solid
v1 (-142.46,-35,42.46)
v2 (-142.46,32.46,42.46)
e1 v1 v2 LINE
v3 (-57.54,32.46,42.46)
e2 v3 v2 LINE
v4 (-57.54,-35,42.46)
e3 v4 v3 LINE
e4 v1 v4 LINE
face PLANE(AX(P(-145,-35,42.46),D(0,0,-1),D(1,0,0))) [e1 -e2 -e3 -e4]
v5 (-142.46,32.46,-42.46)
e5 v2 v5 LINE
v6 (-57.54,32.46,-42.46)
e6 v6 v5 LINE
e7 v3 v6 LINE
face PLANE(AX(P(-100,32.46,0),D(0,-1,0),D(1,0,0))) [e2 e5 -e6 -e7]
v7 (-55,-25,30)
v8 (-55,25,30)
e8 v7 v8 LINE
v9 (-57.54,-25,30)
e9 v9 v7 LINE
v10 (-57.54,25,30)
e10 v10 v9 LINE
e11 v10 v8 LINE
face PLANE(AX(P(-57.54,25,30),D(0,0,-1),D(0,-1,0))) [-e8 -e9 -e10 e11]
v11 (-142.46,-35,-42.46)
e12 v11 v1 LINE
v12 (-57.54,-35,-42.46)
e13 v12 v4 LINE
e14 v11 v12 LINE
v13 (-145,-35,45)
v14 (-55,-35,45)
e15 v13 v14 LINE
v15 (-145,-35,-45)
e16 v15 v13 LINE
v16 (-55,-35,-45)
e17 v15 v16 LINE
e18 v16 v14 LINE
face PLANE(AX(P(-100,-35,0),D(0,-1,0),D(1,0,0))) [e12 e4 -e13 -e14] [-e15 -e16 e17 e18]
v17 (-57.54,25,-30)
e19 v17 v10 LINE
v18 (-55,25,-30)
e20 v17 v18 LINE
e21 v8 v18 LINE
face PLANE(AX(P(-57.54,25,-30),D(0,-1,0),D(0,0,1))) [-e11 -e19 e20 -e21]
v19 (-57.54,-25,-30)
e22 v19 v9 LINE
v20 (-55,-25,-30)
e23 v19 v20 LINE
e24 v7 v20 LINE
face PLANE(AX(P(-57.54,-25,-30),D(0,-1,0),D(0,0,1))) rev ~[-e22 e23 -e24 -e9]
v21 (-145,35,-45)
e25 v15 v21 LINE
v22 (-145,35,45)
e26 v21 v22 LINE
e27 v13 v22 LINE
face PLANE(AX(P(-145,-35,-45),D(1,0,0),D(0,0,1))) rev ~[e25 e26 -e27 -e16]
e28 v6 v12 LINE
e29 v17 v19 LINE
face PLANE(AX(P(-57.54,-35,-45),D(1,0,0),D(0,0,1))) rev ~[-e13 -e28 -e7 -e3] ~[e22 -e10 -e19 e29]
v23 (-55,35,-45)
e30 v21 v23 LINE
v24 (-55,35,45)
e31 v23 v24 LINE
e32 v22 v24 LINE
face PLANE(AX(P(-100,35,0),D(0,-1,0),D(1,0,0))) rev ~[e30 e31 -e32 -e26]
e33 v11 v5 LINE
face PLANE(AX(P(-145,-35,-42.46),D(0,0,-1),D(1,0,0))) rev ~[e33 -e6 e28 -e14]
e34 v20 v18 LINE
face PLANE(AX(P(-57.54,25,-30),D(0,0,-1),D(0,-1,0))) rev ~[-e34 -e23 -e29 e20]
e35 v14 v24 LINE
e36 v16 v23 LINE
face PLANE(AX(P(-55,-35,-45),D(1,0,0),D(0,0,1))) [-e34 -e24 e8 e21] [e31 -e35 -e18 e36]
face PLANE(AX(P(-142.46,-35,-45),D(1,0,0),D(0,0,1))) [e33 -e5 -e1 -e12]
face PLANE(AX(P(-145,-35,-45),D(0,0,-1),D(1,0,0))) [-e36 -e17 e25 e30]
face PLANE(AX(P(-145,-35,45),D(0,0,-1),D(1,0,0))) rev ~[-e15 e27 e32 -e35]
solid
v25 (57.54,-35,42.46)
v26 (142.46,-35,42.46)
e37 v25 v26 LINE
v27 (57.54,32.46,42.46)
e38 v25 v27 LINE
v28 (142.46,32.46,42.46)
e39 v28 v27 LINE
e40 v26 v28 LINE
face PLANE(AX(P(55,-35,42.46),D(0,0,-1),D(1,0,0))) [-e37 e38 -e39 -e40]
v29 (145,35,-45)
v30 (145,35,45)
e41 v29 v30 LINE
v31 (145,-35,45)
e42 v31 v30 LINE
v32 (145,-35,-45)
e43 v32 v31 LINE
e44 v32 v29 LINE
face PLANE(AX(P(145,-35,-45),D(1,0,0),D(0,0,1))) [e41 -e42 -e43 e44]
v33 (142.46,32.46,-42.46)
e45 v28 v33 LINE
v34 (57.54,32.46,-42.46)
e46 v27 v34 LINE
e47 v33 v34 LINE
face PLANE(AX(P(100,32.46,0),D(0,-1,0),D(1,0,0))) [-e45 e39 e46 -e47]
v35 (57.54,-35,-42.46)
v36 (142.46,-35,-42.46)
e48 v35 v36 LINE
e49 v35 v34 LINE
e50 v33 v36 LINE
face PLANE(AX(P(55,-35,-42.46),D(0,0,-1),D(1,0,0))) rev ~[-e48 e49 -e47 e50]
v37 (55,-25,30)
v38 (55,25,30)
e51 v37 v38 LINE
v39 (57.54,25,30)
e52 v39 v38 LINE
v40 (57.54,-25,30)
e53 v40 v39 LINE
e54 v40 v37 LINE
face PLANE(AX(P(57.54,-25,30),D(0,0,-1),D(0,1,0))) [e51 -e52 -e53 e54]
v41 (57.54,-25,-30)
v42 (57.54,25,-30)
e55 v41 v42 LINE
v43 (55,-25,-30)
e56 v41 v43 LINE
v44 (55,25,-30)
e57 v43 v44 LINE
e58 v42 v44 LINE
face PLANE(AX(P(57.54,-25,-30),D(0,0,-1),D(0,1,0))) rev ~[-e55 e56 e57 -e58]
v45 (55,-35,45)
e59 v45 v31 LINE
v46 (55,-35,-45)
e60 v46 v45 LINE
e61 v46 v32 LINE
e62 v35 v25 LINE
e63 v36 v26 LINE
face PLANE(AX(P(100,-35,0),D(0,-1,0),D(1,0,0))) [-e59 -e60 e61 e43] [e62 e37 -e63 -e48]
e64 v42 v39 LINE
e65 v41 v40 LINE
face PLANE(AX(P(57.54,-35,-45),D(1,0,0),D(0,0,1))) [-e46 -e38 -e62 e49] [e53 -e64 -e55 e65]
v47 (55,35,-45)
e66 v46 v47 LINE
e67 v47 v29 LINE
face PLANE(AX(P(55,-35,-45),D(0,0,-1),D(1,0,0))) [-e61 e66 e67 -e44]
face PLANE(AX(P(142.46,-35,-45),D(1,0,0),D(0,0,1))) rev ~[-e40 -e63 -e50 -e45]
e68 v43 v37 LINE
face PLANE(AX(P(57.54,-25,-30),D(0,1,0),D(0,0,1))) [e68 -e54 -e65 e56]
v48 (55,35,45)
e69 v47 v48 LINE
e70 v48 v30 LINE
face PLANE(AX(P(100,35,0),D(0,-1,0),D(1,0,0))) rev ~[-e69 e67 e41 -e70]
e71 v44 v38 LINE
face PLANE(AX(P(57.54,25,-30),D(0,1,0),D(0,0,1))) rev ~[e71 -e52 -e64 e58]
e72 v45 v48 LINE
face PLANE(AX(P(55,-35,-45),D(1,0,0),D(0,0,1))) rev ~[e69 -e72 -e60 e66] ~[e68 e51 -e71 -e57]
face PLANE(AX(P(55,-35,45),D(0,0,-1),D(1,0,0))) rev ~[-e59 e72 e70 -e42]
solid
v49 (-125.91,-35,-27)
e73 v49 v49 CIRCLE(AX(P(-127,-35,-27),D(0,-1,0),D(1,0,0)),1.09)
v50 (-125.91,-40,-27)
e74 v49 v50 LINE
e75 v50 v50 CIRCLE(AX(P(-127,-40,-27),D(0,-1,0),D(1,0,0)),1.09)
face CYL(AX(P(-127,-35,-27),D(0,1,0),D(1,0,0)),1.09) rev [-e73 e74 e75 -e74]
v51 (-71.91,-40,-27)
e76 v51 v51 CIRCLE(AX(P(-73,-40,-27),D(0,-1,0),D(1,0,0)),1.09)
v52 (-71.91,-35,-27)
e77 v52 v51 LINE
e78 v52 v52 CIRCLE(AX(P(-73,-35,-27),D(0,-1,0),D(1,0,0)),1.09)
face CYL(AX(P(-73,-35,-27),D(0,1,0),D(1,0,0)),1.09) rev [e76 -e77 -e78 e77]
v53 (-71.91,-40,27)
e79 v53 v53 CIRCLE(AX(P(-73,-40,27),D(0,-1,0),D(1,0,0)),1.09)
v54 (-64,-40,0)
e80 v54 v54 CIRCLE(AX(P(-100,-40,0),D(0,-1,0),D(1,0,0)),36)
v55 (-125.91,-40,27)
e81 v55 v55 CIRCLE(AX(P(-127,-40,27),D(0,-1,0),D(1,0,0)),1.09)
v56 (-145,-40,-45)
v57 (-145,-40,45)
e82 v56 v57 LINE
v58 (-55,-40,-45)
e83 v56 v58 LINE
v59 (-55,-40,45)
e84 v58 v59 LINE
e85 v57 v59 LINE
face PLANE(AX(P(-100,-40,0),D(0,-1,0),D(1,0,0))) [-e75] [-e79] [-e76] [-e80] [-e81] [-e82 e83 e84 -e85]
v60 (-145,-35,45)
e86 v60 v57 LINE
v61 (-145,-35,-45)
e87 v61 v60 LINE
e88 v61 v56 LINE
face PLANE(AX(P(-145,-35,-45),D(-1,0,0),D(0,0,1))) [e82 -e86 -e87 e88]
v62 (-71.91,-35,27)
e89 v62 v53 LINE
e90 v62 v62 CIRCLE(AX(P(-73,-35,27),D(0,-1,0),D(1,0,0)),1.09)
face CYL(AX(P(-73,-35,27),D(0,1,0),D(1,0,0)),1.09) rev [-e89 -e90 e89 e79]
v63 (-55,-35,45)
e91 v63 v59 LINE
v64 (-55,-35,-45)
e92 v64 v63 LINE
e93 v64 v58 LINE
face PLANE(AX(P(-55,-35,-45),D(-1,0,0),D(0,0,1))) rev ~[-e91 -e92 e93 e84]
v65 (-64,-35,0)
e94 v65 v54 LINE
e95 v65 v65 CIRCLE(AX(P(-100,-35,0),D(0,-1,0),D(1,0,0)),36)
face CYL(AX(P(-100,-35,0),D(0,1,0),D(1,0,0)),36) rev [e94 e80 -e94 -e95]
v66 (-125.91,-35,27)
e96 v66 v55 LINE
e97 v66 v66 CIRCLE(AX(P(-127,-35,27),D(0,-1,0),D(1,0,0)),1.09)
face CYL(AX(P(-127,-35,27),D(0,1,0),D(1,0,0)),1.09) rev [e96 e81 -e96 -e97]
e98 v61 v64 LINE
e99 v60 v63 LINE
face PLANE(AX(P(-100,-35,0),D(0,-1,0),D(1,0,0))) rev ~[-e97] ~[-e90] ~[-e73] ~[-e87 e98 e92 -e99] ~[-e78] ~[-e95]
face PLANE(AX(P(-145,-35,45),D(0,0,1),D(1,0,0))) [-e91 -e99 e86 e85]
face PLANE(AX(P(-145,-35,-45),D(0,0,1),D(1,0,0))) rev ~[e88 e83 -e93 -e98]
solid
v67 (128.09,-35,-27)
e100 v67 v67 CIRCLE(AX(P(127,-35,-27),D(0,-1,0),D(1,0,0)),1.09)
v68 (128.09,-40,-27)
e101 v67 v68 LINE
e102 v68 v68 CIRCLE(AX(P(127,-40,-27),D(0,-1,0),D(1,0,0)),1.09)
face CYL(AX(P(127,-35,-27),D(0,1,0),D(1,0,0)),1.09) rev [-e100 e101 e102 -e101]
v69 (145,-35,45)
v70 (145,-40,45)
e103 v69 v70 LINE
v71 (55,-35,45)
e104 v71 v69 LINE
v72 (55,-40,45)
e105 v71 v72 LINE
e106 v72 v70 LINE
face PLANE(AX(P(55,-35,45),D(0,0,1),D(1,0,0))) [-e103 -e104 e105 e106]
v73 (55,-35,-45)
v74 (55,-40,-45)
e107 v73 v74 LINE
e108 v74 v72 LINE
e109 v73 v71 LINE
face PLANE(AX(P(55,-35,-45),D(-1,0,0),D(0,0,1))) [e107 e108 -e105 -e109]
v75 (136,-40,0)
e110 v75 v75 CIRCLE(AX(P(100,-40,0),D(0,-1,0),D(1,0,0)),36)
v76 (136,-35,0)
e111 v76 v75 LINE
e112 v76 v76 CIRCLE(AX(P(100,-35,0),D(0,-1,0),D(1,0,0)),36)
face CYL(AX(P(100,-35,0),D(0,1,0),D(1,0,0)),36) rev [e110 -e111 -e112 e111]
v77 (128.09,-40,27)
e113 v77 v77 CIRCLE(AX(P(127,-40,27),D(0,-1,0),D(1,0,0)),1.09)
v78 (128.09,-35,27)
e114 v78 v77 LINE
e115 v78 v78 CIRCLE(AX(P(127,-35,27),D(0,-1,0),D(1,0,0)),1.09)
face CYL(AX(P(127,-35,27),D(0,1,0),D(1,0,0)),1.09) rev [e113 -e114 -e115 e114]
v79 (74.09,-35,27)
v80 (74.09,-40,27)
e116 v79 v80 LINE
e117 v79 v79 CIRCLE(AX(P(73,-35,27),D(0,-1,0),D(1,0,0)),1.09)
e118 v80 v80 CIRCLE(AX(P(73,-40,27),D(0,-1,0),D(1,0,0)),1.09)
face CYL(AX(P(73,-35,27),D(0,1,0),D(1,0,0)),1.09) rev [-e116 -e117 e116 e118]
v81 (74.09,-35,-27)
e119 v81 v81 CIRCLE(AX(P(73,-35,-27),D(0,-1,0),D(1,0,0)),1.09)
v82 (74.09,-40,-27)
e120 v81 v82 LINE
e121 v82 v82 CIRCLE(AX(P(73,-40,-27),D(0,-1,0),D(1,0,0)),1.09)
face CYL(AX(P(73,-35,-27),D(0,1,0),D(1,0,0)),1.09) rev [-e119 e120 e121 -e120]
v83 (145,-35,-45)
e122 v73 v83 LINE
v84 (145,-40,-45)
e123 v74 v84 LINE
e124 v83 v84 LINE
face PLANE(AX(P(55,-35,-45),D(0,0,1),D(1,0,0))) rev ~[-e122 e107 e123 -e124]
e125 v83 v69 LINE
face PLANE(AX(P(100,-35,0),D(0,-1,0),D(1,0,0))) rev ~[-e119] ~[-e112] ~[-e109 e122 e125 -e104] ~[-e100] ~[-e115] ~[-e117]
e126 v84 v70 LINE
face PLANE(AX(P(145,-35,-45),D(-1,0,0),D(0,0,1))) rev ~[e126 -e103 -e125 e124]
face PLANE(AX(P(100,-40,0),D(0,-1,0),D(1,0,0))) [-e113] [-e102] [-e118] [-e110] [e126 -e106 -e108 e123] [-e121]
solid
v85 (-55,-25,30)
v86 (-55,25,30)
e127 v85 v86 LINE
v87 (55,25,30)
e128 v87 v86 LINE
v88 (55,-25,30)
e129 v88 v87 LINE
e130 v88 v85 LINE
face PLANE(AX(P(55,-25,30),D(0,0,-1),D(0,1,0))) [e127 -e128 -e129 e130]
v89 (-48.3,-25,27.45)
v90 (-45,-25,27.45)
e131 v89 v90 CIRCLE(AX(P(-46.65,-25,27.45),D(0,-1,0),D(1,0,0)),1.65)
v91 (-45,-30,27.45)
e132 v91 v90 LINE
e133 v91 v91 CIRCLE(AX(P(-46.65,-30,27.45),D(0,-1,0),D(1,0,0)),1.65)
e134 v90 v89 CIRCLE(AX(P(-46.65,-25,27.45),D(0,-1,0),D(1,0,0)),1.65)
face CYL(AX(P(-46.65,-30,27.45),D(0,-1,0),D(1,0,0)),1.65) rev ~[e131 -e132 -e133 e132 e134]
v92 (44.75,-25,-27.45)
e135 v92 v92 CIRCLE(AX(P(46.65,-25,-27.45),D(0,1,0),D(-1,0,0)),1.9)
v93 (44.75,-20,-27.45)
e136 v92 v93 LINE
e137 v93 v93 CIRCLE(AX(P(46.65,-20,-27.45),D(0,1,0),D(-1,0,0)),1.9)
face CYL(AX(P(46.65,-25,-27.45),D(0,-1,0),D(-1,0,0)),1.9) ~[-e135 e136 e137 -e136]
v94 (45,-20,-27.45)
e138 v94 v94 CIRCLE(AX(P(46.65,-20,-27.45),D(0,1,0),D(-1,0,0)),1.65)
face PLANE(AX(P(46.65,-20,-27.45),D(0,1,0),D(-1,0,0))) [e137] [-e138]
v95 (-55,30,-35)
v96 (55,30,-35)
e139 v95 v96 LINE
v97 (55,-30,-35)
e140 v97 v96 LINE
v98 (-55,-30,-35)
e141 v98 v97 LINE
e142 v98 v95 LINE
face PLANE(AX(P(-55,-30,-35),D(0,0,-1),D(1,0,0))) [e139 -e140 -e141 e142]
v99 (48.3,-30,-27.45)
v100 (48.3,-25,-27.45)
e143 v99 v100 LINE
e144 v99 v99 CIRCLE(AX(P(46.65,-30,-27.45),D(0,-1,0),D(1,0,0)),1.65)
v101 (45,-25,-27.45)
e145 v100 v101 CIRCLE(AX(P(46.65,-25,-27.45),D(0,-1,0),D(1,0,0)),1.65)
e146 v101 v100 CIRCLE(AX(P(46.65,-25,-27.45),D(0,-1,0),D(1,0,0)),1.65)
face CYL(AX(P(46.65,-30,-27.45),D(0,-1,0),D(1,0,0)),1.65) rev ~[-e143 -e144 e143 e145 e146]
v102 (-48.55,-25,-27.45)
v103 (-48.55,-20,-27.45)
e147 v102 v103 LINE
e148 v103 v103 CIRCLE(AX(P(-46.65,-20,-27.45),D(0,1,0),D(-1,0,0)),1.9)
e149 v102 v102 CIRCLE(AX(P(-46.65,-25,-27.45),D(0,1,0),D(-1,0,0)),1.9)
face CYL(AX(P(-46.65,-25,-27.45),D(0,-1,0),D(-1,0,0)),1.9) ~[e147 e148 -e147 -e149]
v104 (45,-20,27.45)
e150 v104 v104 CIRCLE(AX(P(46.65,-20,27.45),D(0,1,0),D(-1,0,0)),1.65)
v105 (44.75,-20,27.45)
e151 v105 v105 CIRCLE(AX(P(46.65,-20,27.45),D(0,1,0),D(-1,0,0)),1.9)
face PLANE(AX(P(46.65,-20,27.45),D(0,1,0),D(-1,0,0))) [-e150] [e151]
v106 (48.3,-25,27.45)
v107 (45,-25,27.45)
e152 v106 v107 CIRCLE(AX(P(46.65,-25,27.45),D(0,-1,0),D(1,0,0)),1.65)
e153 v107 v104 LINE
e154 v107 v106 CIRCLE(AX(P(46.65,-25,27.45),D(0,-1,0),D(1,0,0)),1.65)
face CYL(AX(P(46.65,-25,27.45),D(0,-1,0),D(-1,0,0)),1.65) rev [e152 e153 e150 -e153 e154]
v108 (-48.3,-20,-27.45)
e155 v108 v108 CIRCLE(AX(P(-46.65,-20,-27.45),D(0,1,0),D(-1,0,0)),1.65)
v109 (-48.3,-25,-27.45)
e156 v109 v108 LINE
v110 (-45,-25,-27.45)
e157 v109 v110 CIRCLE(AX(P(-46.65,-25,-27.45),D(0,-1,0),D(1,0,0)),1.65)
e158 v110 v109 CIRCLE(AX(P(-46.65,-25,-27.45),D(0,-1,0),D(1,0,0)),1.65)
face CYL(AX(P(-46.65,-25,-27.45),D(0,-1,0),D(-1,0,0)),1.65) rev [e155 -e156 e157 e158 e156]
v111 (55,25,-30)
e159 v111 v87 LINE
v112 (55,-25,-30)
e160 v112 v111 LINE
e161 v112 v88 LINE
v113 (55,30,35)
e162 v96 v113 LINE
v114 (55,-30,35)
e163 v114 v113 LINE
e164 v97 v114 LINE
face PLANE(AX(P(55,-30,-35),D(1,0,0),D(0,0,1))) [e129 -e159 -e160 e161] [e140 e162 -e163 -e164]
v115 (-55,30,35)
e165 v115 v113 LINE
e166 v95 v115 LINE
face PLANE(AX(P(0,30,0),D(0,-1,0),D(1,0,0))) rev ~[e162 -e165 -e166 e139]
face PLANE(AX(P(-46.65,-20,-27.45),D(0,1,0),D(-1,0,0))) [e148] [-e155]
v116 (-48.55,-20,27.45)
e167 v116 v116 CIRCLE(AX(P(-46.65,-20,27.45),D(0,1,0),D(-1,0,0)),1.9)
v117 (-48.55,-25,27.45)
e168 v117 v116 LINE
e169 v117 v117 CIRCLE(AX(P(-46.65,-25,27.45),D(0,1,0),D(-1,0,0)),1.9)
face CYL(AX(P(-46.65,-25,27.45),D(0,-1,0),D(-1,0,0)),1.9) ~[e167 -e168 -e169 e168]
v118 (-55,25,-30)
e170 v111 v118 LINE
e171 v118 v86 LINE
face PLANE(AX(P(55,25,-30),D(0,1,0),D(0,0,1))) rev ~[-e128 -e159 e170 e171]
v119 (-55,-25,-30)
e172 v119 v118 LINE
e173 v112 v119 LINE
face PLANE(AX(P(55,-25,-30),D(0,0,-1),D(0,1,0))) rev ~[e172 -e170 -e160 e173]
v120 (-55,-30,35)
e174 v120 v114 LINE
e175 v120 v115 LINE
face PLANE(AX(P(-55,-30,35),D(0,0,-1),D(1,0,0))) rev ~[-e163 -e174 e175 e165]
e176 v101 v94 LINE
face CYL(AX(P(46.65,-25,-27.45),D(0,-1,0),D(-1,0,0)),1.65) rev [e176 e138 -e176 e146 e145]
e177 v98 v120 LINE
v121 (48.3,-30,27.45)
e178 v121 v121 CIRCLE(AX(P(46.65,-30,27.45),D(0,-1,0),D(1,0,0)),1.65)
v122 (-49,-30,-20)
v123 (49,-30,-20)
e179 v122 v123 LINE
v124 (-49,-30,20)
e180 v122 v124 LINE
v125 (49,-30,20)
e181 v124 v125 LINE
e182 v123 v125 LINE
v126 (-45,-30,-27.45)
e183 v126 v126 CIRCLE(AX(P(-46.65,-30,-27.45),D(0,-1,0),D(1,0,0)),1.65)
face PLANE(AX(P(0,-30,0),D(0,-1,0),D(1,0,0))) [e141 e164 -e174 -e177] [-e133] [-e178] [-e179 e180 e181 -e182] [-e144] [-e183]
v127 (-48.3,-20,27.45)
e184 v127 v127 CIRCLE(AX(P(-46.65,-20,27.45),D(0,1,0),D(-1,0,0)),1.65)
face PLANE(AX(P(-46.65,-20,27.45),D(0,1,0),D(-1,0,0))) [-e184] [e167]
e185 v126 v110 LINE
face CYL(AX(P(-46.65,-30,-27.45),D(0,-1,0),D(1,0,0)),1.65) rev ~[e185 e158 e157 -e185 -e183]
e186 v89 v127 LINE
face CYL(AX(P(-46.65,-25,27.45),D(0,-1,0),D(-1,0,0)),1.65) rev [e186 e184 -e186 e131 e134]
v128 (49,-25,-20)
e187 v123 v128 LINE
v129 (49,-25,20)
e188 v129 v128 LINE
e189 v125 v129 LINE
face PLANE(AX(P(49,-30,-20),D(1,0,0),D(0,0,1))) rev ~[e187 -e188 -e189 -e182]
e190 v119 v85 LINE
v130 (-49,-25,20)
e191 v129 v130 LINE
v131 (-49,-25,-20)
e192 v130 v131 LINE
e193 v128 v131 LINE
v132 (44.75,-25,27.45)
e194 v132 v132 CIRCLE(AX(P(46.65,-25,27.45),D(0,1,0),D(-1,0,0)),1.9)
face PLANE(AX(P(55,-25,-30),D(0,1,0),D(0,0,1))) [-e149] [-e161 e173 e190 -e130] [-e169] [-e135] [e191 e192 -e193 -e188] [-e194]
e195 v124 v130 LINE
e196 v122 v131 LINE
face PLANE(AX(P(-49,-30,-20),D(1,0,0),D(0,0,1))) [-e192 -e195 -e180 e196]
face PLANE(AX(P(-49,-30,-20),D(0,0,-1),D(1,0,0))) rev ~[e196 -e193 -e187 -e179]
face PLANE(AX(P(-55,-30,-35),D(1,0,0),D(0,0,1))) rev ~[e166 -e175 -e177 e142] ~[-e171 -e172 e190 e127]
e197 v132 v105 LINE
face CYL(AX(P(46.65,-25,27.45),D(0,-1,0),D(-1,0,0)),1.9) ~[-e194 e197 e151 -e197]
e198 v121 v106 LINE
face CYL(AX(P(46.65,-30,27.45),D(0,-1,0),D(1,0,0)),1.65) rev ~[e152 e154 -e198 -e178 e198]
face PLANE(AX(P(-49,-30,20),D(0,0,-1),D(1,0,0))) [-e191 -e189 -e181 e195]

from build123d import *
from build123d import SkipClean  # not in build123d's __all__

# Parameters (mm, degrees)
F1_W      = 110
F1_H      = 70
F2_DEPTH  = 60
F4_W      = 90
F4_H      = 90
F4_R      = 1.09
F4_R_2    = 36
F5_DEPTH  = 5
F6_W      = 90
F6_H      = 90
F7_DEPTH  = 70
F8_T      = -2.54
F8_2_T    = -2.54
F9_W      = 50
F9_H      = 60
F10_DEPTH = 110
F11_W     = 50
F11_H     = 60
F12_DEPTH = 25.4
F13_W     = 50
F13_H     = 60
F14_DEPTH = 25.4
F15_W     = 98
F15_H     = 40
F15_R     = 1.65
F16_DEPTH = 25.4
F17_R     = 1.9
F17_R_2   = 1.65
F18_DEPTH = 5


# Not quite as in the source:
# - a feature names something its author has since deleted; it is built from what else it names


with BuildPart() as f2:
    # F1 (on offset) → F2 (new body)
    with BuildSketch(Plane.XZ.offset(30)):
        Rectangle(F1_W, F1_H)
    extrude(amount=-F2_DEPTH)

    # F9 (on face) → F10 (cut, through all)
    with BuildSketch(Plane.YZ.offset(55)):
        Rectangle(F9_W, F9_H)
    extrude(amount=-F10_DEPTH, mode=Mode.SUBTRACT)

    # F15 (on offset) → F16 (cut)
    with BuildSketch(Plane.XZ.offset(30)):
        Rectangle(F15_W, F15_H)
        with Locations((46.65, 27.45)):
            Circle(F15_R)
        with Locations((-46.65, 27.45)):
            Circle(F15_R)
        with Locations((-46.65, -27.45)):
            Circle(F15_R)
        with Locations((46.65, -27.45)):
            Circle(F15_R)
    extrude(amount=-F16_DEPTH, mode=Mode.SUBTRACT)

    # F17 (on face) → F18 (join)
    with BuildSketch(Plane(origin=(0, -25, 0), x_dir=(-1, 0, 0), z_dir=(0, 1, 0))):
        with Locations((-46.65, 27.45)):
            Circle(F17_R)
        with Locations((-46.65, 27.45)):
            Circle(F17_R_2, mode=Mode.SUBTRACT)
        with Locations((46.65, 27.45)):
            Circle(F17_R)
        with Locations((46.65, 27.45)):
            Circle(F17_R_2, mode=Mode.SUBTRACT)
        with Locations((46.65, -27.45)):
            Circle(F17_R)
        with Locations((46.65, -27.45)):
            Circle(F17_R_2, mode=Mode.SUBTRACT)
        with Locations((-46.65, -27.45)):
            Circle(F17_R)
        with Locations((-46.65, -27.45)):
            Circle(F17_R_2, mode=Mode.SUBTRACT)
    with SkipClean():  # cleaning this boolean's faces spoils the solid; the shape is the same uncleaned
        extrude(amount=F18_DEPTH)


with BuildPart() as f5:
    # F4 (on offset) → F5 (new body)
    with BuildSketch(Plane.XZ.offset(35)):
        with Locations((-100, 0)):
            Rectangle(F4_W, F4_H)
        with Locations((-127, -27)):
            Circle(F4_R, mode=Mode.SUBTRACT)
        with Locations((-73, -27)):
            Circle(F4_R, mode=Mode.SUBTRACT)
        with Locations((-100, 0)):
            Circle(F4_R_2, mode=Mode.SUBTRACT)
        with Locations((-127, 27)):
            Circle(F4_R, mode=Mode.SUBTRACT)
        with Locations((-73, 27)):
            Circle(F4_R, mode=Mode.SUBTRACT)
    extrude(amount=F5_DEPTH)


with BuildPart() as f5b:
    # F4 (on offset) → F5, piece 2 (new body)
    with BuildSketch(Plane.XZ.offset(35)):
        with Locations((100, 0)):
            Rectangle(F4_W, F4_H)
        with Locations((73, -27)):
            Circle(F4_R, mode=Mode.SUBTRACT)
        with Locations((127, -27)):
            Circle(F4_R, mode=Mode.SUBTRACT)
        with Locations((100, 0)):
            Circle(F4_R_2, mode=Mode.SUBTRACT)
        with Locations((73, 27)):
            Circle(F4_R, mode=Mode.SUBTRACT)
        with Locations((127, 27)):
            Circle(F4_R, mode=Mode.SUBTRACT)
    extrude(amount=F5_DEPTH)


with BuildPart() as f7:
    # F6 (on offset) → F7 (new body)
    with BuildSketch(Plane.XZ.offset(35)):
        with Locations((-100, 0)):
            Rectangle(F6_W, F6_H)
    extrude(amount=-F7_DEPTH)

    # F8
    f8_openings = [f7.faces().sort_by_distance(p)[0] for p in [
        (-100, -35, 0),
    ]]
    offset(amount=F8_T, openings=f8_openings)

    # F13 (on face) → F14 (cut)
    with BuildSketch(Plane(origin=(-57.54, 0, 0), x_dir=(0, -1, 0), z_dir=(-1, 0, 0))):
        Rectangle(F13_W, F13_H)
    extrude(amount=-F14_DEPTH, mode=Mode.SUBTRACT)


with BuildPart() as f7b:
    # F6 (on offset) → F7, piece 2 (new body)
    with BuildSketch(Plane.XZ.offset(35)):
        with Locations((100, 0)):
            Rectangle(F6_W, F6_H)
    extrude(amount=-F7_DEPTH)

    # F8#2
    f8_2_openings = [f7b.faces().sort_by_distance(p)[0] for p in [
        (100, -35, 0),
    ]]
    offset(amount=F8_2_T, openings=f8_2_openings)

    # F11 (on face) → F12 (cut)
    with BuildSketch(Plane.YZ.offset(57.54)):
        Rectangle(F11_W, F11_H)
    extrude(amount=-F12_DEPTH, mode=Mode.SUBTRACT)


solid = Compound([f2.part, f5.part, f5b.part, f7.part, f7b.part])
